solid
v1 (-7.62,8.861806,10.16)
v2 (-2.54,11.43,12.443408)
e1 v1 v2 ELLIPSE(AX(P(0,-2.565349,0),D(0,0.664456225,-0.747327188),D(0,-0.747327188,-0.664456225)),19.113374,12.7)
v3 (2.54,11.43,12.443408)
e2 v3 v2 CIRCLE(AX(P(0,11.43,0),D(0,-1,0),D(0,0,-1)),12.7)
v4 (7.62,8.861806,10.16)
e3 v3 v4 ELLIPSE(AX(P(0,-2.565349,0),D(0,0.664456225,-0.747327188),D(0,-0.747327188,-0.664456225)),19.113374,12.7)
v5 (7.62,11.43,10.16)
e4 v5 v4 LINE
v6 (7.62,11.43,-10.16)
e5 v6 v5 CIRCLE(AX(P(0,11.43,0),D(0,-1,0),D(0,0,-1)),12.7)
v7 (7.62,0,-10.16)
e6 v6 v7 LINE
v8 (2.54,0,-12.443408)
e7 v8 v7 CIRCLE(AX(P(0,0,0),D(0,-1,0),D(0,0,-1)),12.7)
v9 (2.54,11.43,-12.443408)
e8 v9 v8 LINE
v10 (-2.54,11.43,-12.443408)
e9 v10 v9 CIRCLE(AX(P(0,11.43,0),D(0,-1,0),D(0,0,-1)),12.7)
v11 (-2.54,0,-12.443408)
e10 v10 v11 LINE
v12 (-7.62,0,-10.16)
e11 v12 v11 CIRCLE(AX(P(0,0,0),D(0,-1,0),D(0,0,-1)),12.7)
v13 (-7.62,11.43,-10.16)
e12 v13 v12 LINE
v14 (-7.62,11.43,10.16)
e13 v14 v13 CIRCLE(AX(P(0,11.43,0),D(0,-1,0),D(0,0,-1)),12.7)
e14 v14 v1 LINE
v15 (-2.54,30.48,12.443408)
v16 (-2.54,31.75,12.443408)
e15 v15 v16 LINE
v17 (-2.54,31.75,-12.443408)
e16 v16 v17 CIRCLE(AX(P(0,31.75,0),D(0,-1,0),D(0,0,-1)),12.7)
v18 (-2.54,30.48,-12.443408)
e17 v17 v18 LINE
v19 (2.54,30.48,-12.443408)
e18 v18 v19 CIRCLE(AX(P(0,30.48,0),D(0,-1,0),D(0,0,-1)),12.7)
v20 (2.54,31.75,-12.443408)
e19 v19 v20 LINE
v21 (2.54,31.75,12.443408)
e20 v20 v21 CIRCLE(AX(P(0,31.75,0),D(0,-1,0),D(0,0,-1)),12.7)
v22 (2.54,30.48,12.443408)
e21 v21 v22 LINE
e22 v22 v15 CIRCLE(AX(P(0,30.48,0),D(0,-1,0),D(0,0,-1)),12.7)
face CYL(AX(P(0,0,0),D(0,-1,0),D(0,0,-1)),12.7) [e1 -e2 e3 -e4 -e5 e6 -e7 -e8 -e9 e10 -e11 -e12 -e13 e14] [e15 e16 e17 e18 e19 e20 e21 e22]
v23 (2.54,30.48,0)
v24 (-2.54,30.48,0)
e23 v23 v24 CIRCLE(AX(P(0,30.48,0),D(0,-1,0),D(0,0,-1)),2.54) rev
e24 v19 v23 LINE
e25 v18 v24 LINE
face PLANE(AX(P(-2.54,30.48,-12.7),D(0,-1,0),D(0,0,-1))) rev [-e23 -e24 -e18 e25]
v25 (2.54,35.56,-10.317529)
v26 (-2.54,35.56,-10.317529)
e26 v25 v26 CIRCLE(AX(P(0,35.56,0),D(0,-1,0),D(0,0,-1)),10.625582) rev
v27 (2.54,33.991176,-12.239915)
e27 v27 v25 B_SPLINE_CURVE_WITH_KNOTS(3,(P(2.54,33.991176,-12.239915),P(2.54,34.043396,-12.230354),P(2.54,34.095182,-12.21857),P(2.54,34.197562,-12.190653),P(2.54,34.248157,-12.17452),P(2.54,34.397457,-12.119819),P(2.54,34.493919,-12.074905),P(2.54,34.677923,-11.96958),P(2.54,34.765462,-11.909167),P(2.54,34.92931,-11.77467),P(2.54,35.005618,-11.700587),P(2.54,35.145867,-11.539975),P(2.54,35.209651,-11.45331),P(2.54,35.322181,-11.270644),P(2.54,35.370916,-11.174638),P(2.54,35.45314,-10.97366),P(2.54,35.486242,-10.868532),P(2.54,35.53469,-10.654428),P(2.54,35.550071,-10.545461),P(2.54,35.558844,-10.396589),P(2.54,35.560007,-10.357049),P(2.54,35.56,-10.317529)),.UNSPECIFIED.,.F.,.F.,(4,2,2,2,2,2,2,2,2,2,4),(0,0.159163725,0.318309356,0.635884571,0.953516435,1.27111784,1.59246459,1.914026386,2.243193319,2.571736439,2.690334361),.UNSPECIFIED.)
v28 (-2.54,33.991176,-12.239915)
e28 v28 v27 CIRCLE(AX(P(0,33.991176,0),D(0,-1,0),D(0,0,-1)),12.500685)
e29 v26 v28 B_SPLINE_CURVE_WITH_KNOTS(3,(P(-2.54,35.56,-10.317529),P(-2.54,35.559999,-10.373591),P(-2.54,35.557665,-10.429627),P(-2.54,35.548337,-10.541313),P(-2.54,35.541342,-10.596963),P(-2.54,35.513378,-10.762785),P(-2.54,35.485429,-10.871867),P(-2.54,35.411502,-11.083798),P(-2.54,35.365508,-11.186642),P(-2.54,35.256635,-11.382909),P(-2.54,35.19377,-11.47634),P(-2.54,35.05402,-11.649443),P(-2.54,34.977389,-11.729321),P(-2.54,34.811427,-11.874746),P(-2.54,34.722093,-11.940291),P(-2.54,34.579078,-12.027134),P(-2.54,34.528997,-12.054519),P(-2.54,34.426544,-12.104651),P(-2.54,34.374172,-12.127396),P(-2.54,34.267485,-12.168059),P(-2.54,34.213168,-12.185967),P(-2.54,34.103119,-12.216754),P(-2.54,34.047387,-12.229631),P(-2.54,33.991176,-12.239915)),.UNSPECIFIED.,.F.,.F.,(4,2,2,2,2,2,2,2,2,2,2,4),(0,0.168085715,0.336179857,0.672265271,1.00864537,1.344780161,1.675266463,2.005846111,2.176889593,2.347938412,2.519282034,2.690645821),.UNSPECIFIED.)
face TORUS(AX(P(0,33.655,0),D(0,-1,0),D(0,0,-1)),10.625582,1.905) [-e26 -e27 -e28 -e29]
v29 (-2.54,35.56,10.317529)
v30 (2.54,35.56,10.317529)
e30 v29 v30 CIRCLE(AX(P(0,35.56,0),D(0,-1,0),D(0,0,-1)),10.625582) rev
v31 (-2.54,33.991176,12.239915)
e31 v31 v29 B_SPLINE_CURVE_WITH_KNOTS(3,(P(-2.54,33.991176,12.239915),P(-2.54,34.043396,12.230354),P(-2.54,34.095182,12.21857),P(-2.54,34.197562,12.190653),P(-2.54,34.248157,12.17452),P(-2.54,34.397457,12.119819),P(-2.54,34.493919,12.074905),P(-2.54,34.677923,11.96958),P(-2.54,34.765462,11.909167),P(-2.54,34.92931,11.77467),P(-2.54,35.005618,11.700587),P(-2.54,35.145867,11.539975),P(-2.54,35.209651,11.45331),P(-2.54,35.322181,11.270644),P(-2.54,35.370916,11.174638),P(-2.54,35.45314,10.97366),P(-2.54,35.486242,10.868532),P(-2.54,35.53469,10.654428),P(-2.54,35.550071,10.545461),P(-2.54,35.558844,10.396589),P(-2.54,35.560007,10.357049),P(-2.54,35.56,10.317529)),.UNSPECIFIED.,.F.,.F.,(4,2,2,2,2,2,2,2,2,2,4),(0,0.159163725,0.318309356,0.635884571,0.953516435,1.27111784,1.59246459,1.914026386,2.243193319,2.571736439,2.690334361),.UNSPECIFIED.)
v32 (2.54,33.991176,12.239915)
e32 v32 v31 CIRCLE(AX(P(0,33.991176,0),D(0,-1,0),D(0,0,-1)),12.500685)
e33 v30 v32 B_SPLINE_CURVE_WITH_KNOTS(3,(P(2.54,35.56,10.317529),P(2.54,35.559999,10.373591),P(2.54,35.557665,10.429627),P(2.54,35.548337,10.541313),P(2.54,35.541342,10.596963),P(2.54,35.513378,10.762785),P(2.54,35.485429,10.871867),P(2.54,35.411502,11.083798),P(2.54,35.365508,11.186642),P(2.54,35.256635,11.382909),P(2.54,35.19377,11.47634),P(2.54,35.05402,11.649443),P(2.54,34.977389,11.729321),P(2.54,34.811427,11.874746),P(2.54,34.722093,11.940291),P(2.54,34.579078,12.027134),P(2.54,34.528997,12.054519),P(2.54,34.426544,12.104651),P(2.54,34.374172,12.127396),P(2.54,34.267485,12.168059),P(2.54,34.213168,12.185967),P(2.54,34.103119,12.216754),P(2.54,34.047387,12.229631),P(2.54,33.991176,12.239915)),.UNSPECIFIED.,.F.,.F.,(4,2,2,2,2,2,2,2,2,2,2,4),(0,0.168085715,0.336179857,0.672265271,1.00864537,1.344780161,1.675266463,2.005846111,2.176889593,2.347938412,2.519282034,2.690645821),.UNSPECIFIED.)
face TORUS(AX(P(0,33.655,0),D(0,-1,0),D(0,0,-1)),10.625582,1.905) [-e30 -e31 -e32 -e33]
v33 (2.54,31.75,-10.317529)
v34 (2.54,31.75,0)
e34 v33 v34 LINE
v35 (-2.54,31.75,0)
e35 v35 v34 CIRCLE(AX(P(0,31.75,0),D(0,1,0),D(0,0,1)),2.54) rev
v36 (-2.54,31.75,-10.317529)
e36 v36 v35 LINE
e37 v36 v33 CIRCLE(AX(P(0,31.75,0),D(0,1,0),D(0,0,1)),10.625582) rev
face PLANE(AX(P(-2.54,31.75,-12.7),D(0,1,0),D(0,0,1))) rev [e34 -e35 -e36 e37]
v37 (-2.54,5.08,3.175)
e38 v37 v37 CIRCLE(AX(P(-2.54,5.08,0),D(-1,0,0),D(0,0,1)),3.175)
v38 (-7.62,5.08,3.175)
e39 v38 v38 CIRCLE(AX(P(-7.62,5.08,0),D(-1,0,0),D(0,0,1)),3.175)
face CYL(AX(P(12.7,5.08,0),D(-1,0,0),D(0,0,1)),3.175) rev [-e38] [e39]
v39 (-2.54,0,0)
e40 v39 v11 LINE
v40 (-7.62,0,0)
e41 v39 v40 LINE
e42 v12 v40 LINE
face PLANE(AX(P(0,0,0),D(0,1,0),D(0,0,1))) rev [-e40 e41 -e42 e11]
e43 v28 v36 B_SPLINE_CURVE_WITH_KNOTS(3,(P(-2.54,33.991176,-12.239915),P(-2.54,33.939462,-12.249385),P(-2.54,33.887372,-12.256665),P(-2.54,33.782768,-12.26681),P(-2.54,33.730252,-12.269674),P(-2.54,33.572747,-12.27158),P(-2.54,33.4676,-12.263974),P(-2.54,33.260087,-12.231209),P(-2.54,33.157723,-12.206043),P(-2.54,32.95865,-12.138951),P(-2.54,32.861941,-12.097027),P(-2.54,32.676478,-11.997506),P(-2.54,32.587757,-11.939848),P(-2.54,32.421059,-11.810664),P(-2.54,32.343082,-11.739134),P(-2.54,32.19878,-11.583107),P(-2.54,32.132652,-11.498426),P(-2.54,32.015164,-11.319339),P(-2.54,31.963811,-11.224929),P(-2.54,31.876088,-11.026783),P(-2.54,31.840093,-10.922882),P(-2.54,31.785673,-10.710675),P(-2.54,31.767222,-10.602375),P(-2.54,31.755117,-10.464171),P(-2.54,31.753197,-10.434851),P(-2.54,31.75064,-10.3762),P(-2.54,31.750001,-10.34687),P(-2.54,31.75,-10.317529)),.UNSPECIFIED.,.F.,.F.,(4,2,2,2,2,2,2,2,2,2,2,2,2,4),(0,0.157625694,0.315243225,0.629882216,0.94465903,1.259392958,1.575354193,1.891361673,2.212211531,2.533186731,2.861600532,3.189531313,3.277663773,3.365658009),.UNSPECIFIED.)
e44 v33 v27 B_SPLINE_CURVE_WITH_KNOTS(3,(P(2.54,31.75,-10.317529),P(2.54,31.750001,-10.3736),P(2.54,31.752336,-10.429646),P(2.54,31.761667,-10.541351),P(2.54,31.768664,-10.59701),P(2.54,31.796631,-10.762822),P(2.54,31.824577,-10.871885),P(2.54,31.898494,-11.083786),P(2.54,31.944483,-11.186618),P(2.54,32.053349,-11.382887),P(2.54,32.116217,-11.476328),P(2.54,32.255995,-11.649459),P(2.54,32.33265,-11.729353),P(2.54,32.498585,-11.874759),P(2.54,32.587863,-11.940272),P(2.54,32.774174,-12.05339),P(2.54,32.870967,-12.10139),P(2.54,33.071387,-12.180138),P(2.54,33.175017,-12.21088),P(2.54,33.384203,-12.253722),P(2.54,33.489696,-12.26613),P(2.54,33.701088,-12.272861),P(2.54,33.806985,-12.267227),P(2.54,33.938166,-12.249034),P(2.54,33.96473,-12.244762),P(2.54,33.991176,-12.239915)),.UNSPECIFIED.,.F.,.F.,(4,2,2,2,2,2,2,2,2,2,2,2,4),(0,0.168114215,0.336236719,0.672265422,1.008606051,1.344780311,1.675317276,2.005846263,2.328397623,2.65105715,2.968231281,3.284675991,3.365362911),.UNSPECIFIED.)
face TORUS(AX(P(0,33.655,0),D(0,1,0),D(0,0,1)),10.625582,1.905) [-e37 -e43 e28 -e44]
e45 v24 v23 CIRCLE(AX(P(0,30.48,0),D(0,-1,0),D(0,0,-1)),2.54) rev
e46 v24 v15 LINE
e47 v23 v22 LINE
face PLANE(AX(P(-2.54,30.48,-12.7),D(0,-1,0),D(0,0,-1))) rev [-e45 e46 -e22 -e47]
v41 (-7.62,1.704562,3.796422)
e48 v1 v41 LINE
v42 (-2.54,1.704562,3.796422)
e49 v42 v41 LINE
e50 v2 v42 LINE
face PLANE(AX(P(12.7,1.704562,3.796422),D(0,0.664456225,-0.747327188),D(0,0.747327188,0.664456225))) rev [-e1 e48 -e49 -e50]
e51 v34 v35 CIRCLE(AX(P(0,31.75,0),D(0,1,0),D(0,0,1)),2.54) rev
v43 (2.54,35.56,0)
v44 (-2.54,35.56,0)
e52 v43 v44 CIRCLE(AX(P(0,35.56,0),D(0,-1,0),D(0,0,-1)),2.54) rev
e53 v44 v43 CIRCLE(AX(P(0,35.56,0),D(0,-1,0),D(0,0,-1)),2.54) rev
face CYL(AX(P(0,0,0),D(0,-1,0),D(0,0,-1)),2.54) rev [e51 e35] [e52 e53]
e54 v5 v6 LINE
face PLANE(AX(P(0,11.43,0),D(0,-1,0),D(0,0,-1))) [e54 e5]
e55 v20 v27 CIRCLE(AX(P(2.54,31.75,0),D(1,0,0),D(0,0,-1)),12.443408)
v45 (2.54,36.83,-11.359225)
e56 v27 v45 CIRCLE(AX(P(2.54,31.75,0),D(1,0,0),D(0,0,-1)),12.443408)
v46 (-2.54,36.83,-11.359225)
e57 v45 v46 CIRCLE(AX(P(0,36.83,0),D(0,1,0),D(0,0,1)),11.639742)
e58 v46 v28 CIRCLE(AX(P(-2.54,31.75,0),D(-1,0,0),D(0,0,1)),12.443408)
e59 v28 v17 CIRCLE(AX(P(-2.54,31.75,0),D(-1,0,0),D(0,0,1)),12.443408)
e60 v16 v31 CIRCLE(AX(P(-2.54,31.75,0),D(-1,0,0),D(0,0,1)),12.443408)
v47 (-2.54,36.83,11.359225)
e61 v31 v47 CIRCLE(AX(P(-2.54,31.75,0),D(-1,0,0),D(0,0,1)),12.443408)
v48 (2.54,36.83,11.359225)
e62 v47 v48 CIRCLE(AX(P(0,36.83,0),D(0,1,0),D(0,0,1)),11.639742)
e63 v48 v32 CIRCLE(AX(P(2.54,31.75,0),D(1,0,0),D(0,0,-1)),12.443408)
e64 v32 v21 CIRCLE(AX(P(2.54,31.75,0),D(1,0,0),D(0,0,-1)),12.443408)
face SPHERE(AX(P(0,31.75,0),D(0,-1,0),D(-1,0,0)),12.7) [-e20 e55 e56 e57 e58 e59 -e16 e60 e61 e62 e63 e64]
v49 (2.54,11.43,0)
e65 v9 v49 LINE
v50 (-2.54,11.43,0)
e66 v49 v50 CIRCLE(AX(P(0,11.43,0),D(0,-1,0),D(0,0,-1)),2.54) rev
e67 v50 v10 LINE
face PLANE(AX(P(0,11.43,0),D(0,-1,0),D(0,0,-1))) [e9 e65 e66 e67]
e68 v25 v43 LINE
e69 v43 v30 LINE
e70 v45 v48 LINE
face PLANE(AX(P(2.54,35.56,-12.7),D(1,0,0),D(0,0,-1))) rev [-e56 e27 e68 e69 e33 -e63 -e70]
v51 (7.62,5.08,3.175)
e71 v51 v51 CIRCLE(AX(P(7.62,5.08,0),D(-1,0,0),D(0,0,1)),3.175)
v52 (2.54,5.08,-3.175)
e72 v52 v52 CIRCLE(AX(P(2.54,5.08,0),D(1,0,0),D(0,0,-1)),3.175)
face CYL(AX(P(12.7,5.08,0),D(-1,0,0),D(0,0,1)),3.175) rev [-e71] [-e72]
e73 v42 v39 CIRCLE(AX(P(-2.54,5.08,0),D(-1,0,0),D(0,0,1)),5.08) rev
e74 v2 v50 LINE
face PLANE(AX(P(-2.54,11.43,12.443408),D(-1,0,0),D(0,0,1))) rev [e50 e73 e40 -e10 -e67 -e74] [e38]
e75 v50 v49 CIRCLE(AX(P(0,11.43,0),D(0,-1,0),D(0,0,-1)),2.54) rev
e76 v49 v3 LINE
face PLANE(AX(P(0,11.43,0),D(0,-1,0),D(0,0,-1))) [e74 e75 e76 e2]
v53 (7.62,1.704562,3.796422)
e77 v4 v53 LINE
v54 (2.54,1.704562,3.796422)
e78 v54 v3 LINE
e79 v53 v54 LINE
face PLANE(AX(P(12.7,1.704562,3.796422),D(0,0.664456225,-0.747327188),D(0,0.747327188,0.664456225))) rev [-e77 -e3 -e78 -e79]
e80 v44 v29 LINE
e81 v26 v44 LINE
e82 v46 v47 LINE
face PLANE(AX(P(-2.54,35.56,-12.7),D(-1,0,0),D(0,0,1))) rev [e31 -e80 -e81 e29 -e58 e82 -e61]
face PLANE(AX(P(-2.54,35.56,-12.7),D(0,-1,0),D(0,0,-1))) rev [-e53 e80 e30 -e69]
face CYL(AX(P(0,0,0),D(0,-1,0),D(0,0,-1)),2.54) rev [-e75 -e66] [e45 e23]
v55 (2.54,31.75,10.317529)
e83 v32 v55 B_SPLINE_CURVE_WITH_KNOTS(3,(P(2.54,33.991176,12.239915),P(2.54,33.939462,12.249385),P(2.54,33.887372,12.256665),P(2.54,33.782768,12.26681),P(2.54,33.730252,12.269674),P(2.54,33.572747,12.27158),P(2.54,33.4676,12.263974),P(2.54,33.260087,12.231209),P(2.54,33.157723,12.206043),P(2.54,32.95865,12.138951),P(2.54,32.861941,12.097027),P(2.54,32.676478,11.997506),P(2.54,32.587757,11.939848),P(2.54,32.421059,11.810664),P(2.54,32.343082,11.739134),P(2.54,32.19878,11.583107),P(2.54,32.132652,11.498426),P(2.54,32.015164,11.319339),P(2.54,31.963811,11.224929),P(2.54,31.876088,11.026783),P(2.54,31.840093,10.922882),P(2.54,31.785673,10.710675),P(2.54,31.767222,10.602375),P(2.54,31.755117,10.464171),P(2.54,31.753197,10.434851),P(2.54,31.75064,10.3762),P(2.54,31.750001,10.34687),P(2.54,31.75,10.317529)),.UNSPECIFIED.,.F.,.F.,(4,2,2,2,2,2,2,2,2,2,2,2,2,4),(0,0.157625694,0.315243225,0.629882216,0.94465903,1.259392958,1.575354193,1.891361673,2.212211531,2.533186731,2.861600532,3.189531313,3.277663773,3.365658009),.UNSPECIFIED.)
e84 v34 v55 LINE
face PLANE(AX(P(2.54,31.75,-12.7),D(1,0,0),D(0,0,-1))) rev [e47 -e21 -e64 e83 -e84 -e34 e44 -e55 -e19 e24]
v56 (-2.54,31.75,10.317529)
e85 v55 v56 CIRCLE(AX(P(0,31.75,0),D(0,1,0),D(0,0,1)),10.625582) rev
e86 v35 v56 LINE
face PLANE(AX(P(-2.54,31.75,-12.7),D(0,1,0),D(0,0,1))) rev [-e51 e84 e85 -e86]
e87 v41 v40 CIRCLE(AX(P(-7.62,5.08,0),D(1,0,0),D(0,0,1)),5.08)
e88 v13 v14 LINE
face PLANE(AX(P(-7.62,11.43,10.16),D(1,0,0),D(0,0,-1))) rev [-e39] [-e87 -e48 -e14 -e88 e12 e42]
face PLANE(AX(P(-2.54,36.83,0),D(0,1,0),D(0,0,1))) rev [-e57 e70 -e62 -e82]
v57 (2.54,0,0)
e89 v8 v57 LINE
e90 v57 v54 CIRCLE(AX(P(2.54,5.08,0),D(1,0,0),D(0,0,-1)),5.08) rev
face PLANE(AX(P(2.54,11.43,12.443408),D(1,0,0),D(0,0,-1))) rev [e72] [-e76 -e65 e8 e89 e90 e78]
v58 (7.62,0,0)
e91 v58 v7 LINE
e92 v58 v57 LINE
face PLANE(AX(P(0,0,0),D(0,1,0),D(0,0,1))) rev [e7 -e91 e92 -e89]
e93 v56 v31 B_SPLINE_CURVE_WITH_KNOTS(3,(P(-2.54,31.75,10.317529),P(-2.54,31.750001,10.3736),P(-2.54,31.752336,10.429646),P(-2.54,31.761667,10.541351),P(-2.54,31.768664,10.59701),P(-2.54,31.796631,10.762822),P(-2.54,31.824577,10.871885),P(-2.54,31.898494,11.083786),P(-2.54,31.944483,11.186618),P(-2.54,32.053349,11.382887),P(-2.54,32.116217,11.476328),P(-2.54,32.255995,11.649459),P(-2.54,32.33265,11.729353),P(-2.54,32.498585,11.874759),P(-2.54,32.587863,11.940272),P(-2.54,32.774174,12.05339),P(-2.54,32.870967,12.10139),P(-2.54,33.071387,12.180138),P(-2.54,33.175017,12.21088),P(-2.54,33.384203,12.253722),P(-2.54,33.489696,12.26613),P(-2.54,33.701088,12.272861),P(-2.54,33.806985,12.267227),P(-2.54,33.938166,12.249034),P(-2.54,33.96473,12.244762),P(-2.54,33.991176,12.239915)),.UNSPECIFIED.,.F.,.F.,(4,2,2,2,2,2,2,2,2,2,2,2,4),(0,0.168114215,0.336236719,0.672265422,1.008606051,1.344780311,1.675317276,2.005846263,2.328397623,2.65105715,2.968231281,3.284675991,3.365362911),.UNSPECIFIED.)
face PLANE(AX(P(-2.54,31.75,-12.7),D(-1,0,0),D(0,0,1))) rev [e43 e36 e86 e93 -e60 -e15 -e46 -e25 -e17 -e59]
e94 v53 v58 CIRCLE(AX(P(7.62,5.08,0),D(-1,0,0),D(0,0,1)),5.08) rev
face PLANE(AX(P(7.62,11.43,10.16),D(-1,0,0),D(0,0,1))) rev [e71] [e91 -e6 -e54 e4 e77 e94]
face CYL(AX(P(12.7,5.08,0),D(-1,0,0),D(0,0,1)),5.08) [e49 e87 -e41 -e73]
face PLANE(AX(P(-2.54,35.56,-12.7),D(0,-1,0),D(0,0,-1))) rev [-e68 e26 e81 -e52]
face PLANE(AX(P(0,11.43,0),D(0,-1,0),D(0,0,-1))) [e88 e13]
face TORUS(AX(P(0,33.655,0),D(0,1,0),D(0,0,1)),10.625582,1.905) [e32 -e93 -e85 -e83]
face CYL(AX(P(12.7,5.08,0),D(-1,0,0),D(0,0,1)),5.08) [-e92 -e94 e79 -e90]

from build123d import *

# Parameters (mm, degrees)
CUT_EXTRUDE1_DEPTH      = 11.43
SKETCH3_R               = 3.175
CUT_EXTRUDE2_DEPTH      = 51.497474194
CUT_EXTRUDE3_DEPTH      = 48.941448664
CUT_EXTRUDE3_DEPTH_BACK = 48.941448664
SKETCH4_W               = 5.08
SKETCH4_H               = 1.27
FILLET1_R               = 1.905


with BuildPart() as part:
    # Sketch1 → Revolve1 (revolve)
    with BuildSketch(Plane.XY, mode=Mode.PRIVATE) as revolve1_sk:
        with BuildLine():
            Line((0, 0), (0, 5.602635041))
            Line((0, 5.602635041), (-2.54, 5.602635041))
            Line((-2.54, 5.602635041), (-2.54, 36.83))
            Line((-2.54, 36.83), (0, 36.83))
            Line((0, 36.83), (0, 44.45))
            ThreePointArc((0, 44.45), (-8.980256121, 40.730256121), (-12.7, 31.75))
            Line((-12.7, 31.75), (-12.7, 0))
            Line((-12.7, 0), (0, 0))
        make_face()
    revolve(revolve1_sk.sketch.rotate(Axis((0, 0, 0), (0, 1, 0)), 270), axis=Axis((0, 0, 0), (0, 1, 0)))

    # Sketch2 → Cut-Extrude1 (cut)
    with BuildSketch(Plane.XZ):
        with BuildLine():
            Line((-2.54, 12.443407893), (-2.54, -12.443407893))
            ThreePointArc((-2.54, -12.443407893), (0, -12.7), (2.54, -12.443407893))
            Line((2.54, -12.443407893), (2.54, 12.443407893))
            ThreePointArc((2.54, 12.443407893), (0, 12.7), (-2.54, 12.443407893))
        make_face()
        with BuildLine():
            Line((-7.62, 10.16), (-7.62, -10.16))
            ThreePointArc((-7.62, -10.16), (-12.7, 0), (-7.62, 10.16))
        make_face()
        with BuildLine():
            Line((7.62, 10.16), (7.62, -10.16))
            ThreePointArc((7.62, -10.16), (12.7, 0), (7.62, 10.16))
        make_face()
    extrude(amount=-CUT_EXTRUDE1_DEPTH, mode=Mode.SUBTRACT)

    # Sketch3 → Cut-Extrude2 (cut, through all)
    with BuildSketch(Plane.ZY.offset(7.62)):
        with Locations((0, 5.08)):
            Circle(SKETCH3_R)
        with BuildLine():
            Line((0, 0), (12.443407893, 0))
            Line((12.443407893, 0), (12.443407893, 11.43))
            Line((12.443407893, 11.43), (3.796422114, 1.704562379))
            ThreePointArc((3.796422114, 1.704562379), (2.080766311, 0.445691901), (0, 0))
        make_face()
    extrude(amount=-CUT_EXTRUDE2_DEPTH, mode=Mode.SUBTRACT)

    # Sketch4 → Cut-Extrude3 (cut, two sides: drawn at the far end of the back side and taken through both)
    with BuildSketch(Plane.XY.offset(-CUT_EXTRUDE3_DEPTH_BACK)):
        with Locations((0, 31.115)):
            Rectangle(SKETCH4_W, SKETCH4_H)
        with Locations((0, 36.195)):
            Rectangle(SKETCH4_W, SKETCH4_H)
    extrude(amount=CUT_EXTRUDE3_DEPTH + CUT_EXTRUDE3_DEPTH_BACK, mode=Mode.SUBTRACT)

    # Fillet1
    # the kernel refuses this fillet: 1.905 mm, written as the material it takes off along each edge
    with BuildSketch(Plane(origin=(0, 31.75, 0), x_dir=(-0.6006287696946434, 0, 0.7995280364159214), z_dir=(-0.7995280364159214, 0, -0.6006287696946434))) as fillet1_piece_1_section:
        with BuildLine():
            CenterArc((10.625582337, 1.905), FILLET1_R, 270, 100.164248622)
            Line((10.625582337, 0), (12.7, 0))
            ThreePointArc((12.7, 0), (12.650073138, 1.125010933), (12.500685102, 2.241176471))
        make_face()
    fillet1_piece_1 = revolve(axis=Axis((0, 31.75, 0), (0, 1, 0)), revolution_arc=73.829886486, mode=Mode.PRIVATE)
    fillet1_piece_1 = split(fillet1_piece_1, bisect_by=Plane(origin=(-2.54, 32.266908465, 12.1243087), z_dir=(1, 0, 0)), keep=Keep.TOP, mode=Mode.PRIVATE)
    fillet1_piece_1 = split(fillet1_piece_1, bisect_by=Plane(origin=(2.54, 32.266908465, 12.1243087), z_dir=(-1, 0, 0)), keep=Keep.TOP, mode=Mode.PRIVATE)
    add(fillet1_piece_1, mode=Mode.SUBTRACT)
    with BuildSketch(Plane(origin=(0, 35.56, 0), x_dir=(0.5180820301307622, 0, 0.8553309359865267), z_dir=(0.8553309359865267, 0, -0.5180820301307622))) as fillet1_piece_2_section:
        with BuildLine():
            CenterArc((10.625582337, 1.905), FILLET1_R, 270, 79.835751378)
            Line((10.625582337, 0), (12.115027858, 0))
            ThreePointArc((12.115027858, 0), (12.332827452, 0.778273257), (12.500685102, 1.568823529))
        make_face()
    fillet1_piece_2 = revolve(axis=Axis((0, 35.56, 0), (0, -1, 0)), revolution_arc=62.407371172, mode=Mode.PRIVATE)
    fillet1_piece_2 = split(fillet1_piece_2, bisect_by=Plane(origin=(-2.54, 35.21222625, 11.799196002), z_dir=(1, 0, 0)), keep=Keep.TOP, mode=Mode.PRIVATE)
    fillet1_piece_2 = split(fillet1_piece_2, bisect_by=Plane(origin=(2.54, 35.21222625, 11.799196002), z_dir=(-1, 0, 0)), keep=Keep.TOP, mode=Mode.PRIVATE)
    add(fillet1_piece_2, mode=Mode.SUBTRACT)
    with BuildSketch(Plane(origin=(0, 35.56, 0), x_dir=(0, 0, -1), z_dir=(-1, 0, 0))) as fillet1_piece_3_section:
        with BuildLine():
            CenterArc((10.625582337, 1.905), FILLET1_R, 270, 79.835751378)
            Line((10.625582337, 0), (12.115027858, 0))
            ThreePointArc((12.115027858, 0), (12.332827452, 0.778273257), (12.500685102, 1.568823529))
        make_face()
    fillet1_piece_3 = revolve(axis=Axis((0, 35.56, 0), (0, -1, 0)), revolution_arc=31.203269463, mode=Mode.PRIVATE)
    fillet1_piece_3 = split(fillet1_piece_3, bisect_by=Plane(origin=(2.54, 35.212226268, -11.799195909), z_dir=(-1, 0, 0)), keep=Keep.TOP, mode=Mode.PRIVATE)
    add(fillet1_piece_3, mode=Mode.SUBTRACT)
    with BuildSketch(Plane(origin=(0, 31.75, 0), x_dir=(0, 0, -1), z_dir=(1, 0, 0))) as fillet1_piece_4_section:
        with BuildLine():
            CenterArc((10.625582337, 1.905), FILLET1_R, 270, 100.164248622)
            Line((10.625582337, 0), (12.7, 0))
            ThreePointArc((12.7, 0), (12.650073138, 1.125010933), (12.500685102, 2.241176471))
        make_face()
    fillet1_piece_4 = revolve(axis=Axis((0, 31.75, 0), (0, 1, 0)), revolution_arc=36.914440828, mode=Mode.PRIVATE)
    fillet1_piece_4 = split(fillet1_piece_4, bisect_by=Plane(origin=(-2.54, 32.26690841, -12.124308672), z_dir=(1, 0, 0)), keep=Keep.TOP, mode=Mode.PRIVATE)
    add(fillet1_piece_4, mode=Mode.SUBTRACT)
    with BuildSketch(Plane(origin=(0, 31.75, 0), x_dir=(0.6006217587640484, 0, -0.799533303183289), z_dir=(0.799533303183289, 0, 0.6006217587640484))) as fillet1_piece_5_section:
        with BuildLine():
            CenterArc((10.625582337, 1.905), FILLET1_R, 270, 100.164248622)
            Line((10.625582337, 0), (12.7, 0))
            ThreePointArc((12.7, 0), (12.650073138, 1.125010933), (12.500685102, 2.241176471))
        make_face()
    fillet1_piece_5 = revolve(axis=Axis((0, 31.75, 0), (0, 1, 0)), revolution_arc=36.914440828, mode=Mode.PRIVATE)
    fillet1_piece_5 = split(fillet1_piece_5, bisect_by=Plane(origin=(2.54, 32.266908503, -12.124308915), z_dir=(-1, 0, 0)), keep=Keep.TOP, mode=Mode.PRIVATE)
    add(fillet1_piece_5, mode=Mode.SUBTRACT)
    with BuildSketch(Plane(origin=(0, 35.56, 0), x_dir=(-0.5180758180945625, 0, -0.8553346986447177), z_dir=(-0.8553346986447177, 0, 0.5180758180945625))) as fillet1_piece_6_section:
        with BuildLine():
            CenterArc((10.625582337, 1.905), FILLET1_R, 270, 79.835751378)
            Line((10.625582337, 0), (12.115027858, 0))
            ThreePointArc((12.115027858, 0), (12.332827452, 0.778273257), (12.500685102, 1.568823529))
        make_face()
    fillet1_piece_6 = revolve(axis=Axis((0, 35.56, 0), (0, -1, 0)), revolution_arc=31.203269463, mode=Mode.PRIVATE)
    fillet1_piece_6 = split(fillet1_piece_6, bisect_by=Plane(origin=(-2.54, 35.212226169, -11.799196271), z_dir=(1, 0, 0)), keep=Keep.TOP, mode=Mode.PRIVATE)
    add(fillet1_piece_6, mode=Mode.SUBTRACT)


solid = part.part
